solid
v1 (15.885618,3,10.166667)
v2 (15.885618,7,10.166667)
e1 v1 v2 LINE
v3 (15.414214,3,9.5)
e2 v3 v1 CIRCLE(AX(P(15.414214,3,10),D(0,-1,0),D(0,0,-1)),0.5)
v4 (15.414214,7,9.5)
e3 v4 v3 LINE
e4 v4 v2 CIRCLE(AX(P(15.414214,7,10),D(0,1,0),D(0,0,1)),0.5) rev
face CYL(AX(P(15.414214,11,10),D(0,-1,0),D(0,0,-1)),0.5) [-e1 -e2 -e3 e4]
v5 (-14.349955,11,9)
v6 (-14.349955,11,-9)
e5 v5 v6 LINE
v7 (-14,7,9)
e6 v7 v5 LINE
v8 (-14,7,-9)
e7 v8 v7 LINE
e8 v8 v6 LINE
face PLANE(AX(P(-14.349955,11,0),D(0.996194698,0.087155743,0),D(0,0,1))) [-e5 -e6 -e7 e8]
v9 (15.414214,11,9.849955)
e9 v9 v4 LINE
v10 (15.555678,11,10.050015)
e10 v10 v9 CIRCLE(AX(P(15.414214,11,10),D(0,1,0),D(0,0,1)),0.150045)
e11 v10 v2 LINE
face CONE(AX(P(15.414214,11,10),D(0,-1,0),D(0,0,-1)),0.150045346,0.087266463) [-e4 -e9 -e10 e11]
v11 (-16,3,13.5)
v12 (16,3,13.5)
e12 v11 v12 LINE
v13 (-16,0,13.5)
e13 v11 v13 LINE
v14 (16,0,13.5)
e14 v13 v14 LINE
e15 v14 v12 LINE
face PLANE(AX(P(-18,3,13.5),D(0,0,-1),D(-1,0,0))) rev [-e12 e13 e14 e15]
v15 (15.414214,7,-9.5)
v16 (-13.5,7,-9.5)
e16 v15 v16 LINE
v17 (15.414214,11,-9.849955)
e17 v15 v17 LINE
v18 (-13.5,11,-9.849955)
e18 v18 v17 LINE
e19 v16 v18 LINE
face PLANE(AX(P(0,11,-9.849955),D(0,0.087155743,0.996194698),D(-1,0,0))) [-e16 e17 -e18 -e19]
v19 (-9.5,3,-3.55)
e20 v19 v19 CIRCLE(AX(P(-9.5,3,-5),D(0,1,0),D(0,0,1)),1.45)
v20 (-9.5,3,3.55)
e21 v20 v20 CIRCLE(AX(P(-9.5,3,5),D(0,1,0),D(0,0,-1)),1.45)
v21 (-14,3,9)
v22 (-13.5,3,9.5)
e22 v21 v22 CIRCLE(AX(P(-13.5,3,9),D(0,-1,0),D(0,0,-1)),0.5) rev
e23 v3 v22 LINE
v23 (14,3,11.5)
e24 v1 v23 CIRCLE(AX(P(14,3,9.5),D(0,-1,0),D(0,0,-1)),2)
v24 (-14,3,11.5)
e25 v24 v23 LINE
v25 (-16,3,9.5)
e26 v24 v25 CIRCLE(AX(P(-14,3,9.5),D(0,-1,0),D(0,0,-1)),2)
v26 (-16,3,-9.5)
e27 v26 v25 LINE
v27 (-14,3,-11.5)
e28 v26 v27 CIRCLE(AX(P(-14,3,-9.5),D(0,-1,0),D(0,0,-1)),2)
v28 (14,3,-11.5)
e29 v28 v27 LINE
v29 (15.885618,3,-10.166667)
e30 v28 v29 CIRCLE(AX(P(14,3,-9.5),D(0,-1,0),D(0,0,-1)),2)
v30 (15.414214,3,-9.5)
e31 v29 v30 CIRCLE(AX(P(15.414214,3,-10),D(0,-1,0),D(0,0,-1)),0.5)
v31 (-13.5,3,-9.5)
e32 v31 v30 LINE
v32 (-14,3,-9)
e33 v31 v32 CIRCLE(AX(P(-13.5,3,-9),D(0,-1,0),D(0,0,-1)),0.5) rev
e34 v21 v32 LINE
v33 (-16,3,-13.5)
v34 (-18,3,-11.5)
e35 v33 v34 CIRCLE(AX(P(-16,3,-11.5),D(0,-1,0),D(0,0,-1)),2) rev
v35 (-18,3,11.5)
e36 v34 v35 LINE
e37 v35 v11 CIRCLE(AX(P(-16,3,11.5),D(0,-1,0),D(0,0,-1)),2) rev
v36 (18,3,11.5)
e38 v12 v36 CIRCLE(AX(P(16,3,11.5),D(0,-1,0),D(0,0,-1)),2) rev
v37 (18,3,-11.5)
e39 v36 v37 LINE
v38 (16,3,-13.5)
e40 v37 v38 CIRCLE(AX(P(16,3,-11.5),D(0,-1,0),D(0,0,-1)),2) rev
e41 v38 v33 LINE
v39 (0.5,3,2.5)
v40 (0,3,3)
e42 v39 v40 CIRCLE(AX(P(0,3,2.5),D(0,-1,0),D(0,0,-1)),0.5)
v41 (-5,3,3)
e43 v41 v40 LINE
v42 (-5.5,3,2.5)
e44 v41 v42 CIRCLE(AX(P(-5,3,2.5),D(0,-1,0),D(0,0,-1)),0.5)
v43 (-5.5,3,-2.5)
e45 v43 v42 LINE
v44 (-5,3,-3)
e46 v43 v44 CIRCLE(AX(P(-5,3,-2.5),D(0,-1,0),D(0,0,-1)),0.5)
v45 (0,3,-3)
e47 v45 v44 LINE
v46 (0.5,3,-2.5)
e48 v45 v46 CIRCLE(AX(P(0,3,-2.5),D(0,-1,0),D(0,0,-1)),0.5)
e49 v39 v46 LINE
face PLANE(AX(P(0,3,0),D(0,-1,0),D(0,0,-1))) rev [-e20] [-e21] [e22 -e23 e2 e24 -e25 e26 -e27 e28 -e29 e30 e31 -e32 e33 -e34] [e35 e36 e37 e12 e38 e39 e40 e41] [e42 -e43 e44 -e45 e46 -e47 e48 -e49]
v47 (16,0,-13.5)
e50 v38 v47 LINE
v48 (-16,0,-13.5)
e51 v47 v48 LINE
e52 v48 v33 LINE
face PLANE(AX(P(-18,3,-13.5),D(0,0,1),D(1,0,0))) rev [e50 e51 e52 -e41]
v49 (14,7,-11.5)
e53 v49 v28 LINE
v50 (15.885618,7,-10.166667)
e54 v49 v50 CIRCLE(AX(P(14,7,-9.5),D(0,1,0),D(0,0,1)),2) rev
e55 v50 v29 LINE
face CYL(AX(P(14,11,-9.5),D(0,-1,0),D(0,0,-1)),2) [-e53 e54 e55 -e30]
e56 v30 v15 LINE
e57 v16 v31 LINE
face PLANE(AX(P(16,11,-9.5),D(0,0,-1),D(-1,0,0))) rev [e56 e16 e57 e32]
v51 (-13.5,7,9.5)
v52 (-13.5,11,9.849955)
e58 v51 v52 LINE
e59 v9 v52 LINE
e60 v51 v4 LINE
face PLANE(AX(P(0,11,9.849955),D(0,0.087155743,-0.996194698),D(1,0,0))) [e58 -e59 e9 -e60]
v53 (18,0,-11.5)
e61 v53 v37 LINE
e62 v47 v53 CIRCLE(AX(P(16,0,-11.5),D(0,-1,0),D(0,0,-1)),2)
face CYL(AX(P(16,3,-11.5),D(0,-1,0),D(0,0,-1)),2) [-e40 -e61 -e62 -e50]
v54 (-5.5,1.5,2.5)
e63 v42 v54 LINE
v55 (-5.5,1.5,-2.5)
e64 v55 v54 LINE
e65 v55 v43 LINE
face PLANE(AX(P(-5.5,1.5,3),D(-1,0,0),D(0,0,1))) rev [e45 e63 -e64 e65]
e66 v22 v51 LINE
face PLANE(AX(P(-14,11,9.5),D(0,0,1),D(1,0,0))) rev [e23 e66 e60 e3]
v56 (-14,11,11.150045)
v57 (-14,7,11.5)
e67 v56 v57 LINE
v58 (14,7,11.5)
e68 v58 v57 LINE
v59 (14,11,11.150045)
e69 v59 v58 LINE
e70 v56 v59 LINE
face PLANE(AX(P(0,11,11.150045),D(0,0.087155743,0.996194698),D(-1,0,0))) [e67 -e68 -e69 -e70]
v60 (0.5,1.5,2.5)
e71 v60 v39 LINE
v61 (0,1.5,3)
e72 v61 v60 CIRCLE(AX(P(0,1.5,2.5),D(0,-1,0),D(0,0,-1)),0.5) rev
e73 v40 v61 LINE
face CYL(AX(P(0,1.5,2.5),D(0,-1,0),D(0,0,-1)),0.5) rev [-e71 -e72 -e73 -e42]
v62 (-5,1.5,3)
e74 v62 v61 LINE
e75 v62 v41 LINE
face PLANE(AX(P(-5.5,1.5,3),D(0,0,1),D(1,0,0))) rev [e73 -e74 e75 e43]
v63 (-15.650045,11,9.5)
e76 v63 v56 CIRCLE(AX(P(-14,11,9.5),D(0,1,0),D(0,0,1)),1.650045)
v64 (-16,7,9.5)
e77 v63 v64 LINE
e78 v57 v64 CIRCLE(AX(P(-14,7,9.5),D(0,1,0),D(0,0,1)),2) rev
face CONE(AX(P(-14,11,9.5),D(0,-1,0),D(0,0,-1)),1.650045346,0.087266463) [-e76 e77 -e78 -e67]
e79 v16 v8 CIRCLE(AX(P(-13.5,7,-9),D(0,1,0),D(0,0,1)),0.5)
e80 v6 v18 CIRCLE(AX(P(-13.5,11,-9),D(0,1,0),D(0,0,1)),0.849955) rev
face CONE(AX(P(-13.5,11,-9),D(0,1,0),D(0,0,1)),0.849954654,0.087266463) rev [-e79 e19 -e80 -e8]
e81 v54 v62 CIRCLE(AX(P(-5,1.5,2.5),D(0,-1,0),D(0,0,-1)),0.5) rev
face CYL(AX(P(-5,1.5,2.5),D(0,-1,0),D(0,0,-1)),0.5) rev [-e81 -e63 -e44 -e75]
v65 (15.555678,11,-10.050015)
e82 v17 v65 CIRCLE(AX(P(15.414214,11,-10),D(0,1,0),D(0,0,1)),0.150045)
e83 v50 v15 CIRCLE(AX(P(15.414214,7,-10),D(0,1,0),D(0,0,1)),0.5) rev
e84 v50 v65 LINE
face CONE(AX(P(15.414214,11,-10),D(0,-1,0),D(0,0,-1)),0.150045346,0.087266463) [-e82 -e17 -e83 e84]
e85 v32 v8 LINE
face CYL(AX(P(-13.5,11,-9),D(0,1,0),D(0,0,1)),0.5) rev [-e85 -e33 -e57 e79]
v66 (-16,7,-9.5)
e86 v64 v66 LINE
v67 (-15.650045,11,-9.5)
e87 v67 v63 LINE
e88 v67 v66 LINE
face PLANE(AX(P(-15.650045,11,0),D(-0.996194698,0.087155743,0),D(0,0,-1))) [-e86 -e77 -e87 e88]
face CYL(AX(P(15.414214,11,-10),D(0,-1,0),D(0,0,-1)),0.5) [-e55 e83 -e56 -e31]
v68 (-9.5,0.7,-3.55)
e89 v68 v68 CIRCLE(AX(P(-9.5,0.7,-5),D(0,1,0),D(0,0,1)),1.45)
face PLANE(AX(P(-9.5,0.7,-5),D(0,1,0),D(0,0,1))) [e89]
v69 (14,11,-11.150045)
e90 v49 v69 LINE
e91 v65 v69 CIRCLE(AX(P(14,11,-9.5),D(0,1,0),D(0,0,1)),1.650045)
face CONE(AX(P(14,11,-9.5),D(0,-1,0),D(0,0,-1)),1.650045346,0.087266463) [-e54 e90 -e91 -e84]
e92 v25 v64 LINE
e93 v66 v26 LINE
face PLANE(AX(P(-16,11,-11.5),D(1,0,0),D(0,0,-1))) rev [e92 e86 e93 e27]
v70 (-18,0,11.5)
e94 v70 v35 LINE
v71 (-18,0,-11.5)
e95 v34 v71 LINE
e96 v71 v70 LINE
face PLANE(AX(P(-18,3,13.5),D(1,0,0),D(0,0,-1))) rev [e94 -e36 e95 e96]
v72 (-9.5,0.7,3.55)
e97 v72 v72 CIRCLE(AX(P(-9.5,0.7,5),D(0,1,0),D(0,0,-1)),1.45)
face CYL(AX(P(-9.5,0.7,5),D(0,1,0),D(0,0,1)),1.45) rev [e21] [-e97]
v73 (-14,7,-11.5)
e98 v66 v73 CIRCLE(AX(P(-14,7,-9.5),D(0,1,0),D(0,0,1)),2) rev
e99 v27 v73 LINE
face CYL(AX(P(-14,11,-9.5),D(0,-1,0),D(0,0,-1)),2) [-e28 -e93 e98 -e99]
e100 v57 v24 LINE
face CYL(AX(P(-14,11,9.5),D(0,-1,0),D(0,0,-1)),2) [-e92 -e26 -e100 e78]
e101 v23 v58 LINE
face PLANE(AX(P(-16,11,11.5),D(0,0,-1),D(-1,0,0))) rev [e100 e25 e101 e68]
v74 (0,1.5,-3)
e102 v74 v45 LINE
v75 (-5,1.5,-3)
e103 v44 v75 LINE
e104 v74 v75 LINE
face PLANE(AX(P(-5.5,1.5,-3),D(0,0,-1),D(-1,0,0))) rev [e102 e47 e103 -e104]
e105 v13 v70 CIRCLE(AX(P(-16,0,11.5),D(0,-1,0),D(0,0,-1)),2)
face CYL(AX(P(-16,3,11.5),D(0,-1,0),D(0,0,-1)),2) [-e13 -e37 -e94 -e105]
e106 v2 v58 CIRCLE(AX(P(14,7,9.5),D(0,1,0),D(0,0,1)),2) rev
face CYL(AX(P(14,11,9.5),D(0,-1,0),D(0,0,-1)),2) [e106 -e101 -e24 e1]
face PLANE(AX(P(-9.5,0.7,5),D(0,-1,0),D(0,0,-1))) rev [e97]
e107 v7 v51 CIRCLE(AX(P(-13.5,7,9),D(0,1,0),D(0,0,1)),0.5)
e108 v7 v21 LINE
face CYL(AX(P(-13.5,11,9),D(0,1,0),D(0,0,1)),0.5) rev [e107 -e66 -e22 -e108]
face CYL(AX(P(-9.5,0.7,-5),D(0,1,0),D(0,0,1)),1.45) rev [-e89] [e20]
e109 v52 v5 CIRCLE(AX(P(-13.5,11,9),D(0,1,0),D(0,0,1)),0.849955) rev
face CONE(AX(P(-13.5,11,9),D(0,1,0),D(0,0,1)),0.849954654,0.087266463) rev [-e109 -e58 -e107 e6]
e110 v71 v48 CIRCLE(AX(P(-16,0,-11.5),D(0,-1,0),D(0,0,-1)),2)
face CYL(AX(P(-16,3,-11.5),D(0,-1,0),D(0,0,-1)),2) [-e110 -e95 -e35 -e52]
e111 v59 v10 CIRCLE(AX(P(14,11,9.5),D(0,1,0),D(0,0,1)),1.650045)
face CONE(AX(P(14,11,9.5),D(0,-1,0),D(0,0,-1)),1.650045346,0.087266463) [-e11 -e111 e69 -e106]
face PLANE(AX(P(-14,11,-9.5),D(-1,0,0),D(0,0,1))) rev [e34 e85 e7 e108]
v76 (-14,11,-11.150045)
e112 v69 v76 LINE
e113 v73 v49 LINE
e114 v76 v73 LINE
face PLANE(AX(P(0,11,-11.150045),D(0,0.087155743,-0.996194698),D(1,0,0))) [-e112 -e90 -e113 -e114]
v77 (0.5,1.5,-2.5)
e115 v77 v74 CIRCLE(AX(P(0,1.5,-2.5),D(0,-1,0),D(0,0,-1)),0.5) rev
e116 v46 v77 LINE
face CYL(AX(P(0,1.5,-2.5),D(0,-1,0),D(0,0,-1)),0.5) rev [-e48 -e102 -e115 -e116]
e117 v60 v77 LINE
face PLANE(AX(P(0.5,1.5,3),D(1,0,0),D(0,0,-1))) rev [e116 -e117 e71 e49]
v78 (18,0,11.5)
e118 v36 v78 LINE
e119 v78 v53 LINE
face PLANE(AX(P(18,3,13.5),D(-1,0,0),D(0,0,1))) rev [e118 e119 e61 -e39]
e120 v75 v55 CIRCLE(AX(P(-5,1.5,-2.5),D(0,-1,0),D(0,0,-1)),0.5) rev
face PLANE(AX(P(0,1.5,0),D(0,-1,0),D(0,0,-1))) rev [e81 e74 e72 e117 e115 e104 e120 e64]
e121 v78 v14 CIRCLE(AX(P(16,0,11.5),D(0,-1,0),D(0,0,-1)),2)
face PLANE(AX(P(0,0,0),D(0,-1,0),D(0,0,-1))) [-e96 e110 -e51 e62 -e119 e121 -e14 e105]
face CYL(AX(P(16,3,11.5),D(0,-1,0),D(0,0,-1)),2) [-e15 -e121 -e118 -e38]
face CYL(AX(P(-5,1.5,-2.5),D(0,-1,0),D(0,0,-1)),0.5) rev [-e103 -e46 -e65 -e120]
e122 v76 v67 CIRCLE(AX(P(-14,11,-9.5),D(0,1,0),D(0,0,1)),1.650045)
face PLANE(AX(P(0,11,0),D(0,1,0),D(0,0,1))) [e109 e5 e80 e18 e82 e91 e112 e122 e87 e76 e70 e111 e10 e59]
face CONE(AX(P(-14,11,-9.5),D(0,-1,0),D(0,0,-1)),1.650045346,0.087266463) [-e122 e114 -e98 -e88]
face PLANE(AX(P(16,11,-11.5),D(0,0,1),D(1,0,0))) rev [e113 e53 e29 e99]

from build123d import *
from OCP.BRepFilletAPI import BRepFilletAPI_MakeChamfer

# Parameters (mm, degrees)
SKETCH1_W           = 36
SKETCH1_H           = 27
BOSS_EXTRUDE1_DEPTH = 3
SKETCH2_W           = 6
SKETCH2_H           = 6
CUT_EXTRUDE1_DEPTH  = 1.5
SKETCH3_R           = 1.45
CUT_EXTRUDE2_DEPTH  = 2.3
BOSS_EXTRUDE3_DEPTH = 8
FILLET1_R           = 2
FILLET2_R           = 0.5
FILLET3_R           = 0.5
CHAMFER2_SIZE       = 4
CHAMFER2_SIZE2      = 0.349954654


with BuildPart() as part:
    # Sketch1 → Boss-Extrude1 (new body)
    with BuildSketch(Plane(origin=(0, 0, 0), x_dir=(1, 0, 0), z_dir=(0, 1, 0))):
        Rectangle(SKETCH1_W, SKETCH1_H)
    extrude(amount=BOSS_EXTRUDE1_DEPTH)

    # Sketch2 → Cut-Extrude1 (cut)
    with BuildSketch(Plane(origin=(0, 3, 0), x_dir=(1, 0, 0), z_dir=(0, 1, 0))):
        with Locations((-2.5, 0)):
            Rectangle(SKETCH2_W, SKETCH2_H)
    extrude(amount=-CUT_EXTRUDE1_DEPTH, mode=Mode.SUBTRACT)

    # Sketch3 → Cut-Extrude2 (cut)
    with BuildSketch(Plane(origin=(0, 3, 0), x_dir=(1, 0, 0), z_dir=(0, 1, 0))):
        with Locations(Location((-9.5, 5, 0), (0, 0, 270))):
            Circle(SKETCH3_R)
        with Locations(Location((-9.5, -5, 0), (0, 0, 90))):
            Circle(SKETCH3_R)
    extrude(amount=-CUT_EXTRUDE2_DEPTH, mode=Mode.SUBTRACT)

    # Sketch4 → Boss-Extrude3 (add)
    with BuildSketch(Plane(origin=(0, 3, 0), x_dir=(1, 0, 0), z_dir=(0, 1, 0))):
        Polygon((-16, 11.5), (-16, -11.5), (16, -11.5), (16, -9.5), (-14, -9.5), (-14, 9.5), (16, 9.5), (16, 11.5), align=None)
    extrude(amount=BOSS_EXTRUDE3_DEPTH)

    # Fillet1
    fillet1_edges = [part.edges().sort_by_distance(p)[0] for p in [
        (-16, 7, -11.5),
        (16, 7, -11.5),
        (16, 7, 11.5),
        (-16, 7, 11.5),
        (-18, 1.5, 13.5),
        (18, 1.5, 13.5),
        (-18, 1.5, -13.5),
        (18, 1.5, -13.5),
    ]]
    fillet(fillet1_edges, radius=FILLET1_R - 0.0001)  # a hair under: the kernel refuses the full size

    # Fillet2
    fillet2_edges = [part.edges().sort_by_distance(p)[0] for p in [
        (-14, 7, 9.5),
        (-14, 7, -9.5),
    ]]
    fillet(fillet2_edges, radius=FILLET2_R)

    # Fillet3
    fillet3_edges = [part.edges().sort_by_distance(p)[0] for p in [
        (0.5, 2.25, -3),
        (0.5, 2.25, 3),
        (-5.5, 2.25, 3),
        (-5.5, 2.25, -3),
        (16, 7, 9.5),
        (16, 7, -9.5),
    ]]
    fillet(fillet3_edges, radius=FILLET3_R)

    # Chamfer2: one chamfer whose edges measure the first distance from different faces: ONE call of the kernel's chamfer builder (chamfer() names one face for all edges)
    chamfer2_edges_1 = [part.edges().sort_by_distance(p)[0] for p in [
        (0.957121425, 11, -9.5),
    ]]
    chamfer2_side_1 = [part.faces().sort_by_distance(p)[0] for p in [
        (0.957121425, 7, -9.5),
    ]]
    chamfer2_edges_2 = [part.edges().sort_by_distance(p)[0] for p in [
        (-14, 11, 0),
    ]]
    chamfer2_side_2 = [part.faces().sort_by_distance(p)[0] for p in [
        (-14, 7, 0),
    ]]
    chamfer2_edges_3 = [part.edges().sort_by_distance(p)[0] for p in [
        (-13.853553391, 11, -9.353553391),
    ]]
    chamfer2_side_3 = [part.faces().sort_by_distance(p)[0] for p in [
        (-13.853553391, 7, -9.353553391),
    ]]
    chamfer2_edges_4 = [part.edges().sort_by_distance(p)[0] for p in [
        (-13.853553391, 11, 9.353553391),
    ]]
    chamfer2_side_4 = [part.faces().sort_by_distance(p)[0] for p in [
        (-13.853553391, 7, 9.353553391),
    ]]
    chamfer2_edges_5 = [part.edges().sort_by_distance(p)[0] for p in [
        (15.154781293, 11, -11.132984295),
    ]]
    chamfer2_side_5 = [part.faces().sort_by_distance(p)[0] for p in [
        (15.154781293, 7, -11.132984295),
    ]]
    chamfer2_edges_6 = [part.edges().sort_by_distance(p)[0] for p in [
        (0.957121425, 11, 9.5),
    ]]
    chamfer2_side_6 = [part.faces().sort_by_distance(p)[0] for p in [
        (0.957121425, 7, 9.5),
    ]]
    chamfer2_edges_7 = [part.edges().sort_by_distance(p)[0] for p in [
        (15.822484336, 11, 9.711315242),
    ]]
    chamfer2_side_7 = [part.faces().sort_by_distance(p)[0] for p in [
        (15.822484336, 7, 9.711315242),
    ]]
    chamfer2_edges_8 = [part.edges().sort_by_distance(p)[0] for p in [
        (15.822484336, 11, -9.711315242),
    ]]
    chamfer2_side_8 = [part.faces().sort_by_distance(p)[0] for p in [
        (15.822484336, 7, -9.711315242),
    ]]
    chamfer2_edges_9 = [part.edges().sort_by_distance(p)[0] for p in [
        (-16, 11, 0),
    ]]
    chamfer2_side_9 = [part.faces().sort_by_distance(p)[0] for p in [
        (-16, 7, 0),
    ]]
    chamfer2_edges_10 = [part.edges().sort_by_distance(p)[0] for p in [
        (0, 11, -11.5),
    ]]
    chamfer2_side_10 = [part.faces().sort_by_distance(p)[0] for p in [
        (0, 7, -11.5),
    ]]
    chamfer2_edges_11 = [part.edges().sort_by_distance(p)[0] for p in [
        (0, 11, 11.5),
    ]]
    chamfer2_side_11 = [part.faces().sort_by_distance(p)[0] for p in [
        (0, 7, 11.5),
    ]]
    chamfer2_edges_12 = [part.edges().sort_by_distance(p)[0] for p in [
        (-15.414242852, 11, 10.914242852),
    ]]
    chamfer2_side_12 = [part.faces().sort_by_distance(p)[0] for p in [
        (-15.414242852, 7, 10.914242852),
    ]]
    chamfer2_edges_13 = [part.edges().sort_by_distance(p)[0] for p in [
        (15.154781293, 11, 11.132984295),
    ]]
    chamfer2_side_13 = [part.faces().sort_by_distance(p)[0] for p in [
        (15.154781293, 7, 11.132984295),
    ]]
    chamfer2_edges_14 = [part.edges().sort_by_distance(p)[0] for p in [
        (-15.414242852, 11, -10.914242852),
    ]]
    chamfer2_side_14 = [part.faces().sort_by_distance(p)[0] for p in [
        (-15.414242852, 7, -10.914242852),
    ]]
    chamfer2 = BRepFilletAPI_MakeChamfer(part.part.solid().wrapped)
    for e in chamfer2_edges_1:
        chamfer2.Add(CHAMFER2_SIZE, CHAMFER2_SIZE2, e.wrapped, chamfer2_side_1[0].wrapped)  # the first distance lies on this face
    for e in chamfer2_edges_2:
        chamfer2.Add(CHAMFER2_SIZE, CHAMFER2_SIZE2, e.wrapped, chamfer2_side_2[0].wrapped)  # the first distance lies on this face
    for e in chamfer2_edges_3:
        chamfer2.Add(CHAMFER2_SIZE, CHAMFER2_SIZE2, e.wrapped, chamfer2_side_3[0].wrapped)  # the first distance lies on this face
    for e in chamfer2_edges_4:
        chamfer2.Add(CHAMFER2_SIZE, CHAMFER2_SIZE2, e.wrapped, chamfer2_side_4[0].wrapped)  # the first distance lies on this face
    for e in chamfer2_edges_5:
        chamfer2.Add(CHAMFER2_SIZE, CHAMFER2_SIZE2, e.wrapped, chamfer2_side_5[0].wrapped)  # the first distance lies on this face
    for e in chamfer2_edges_6:
        chamfer2.Add(CHAMFER2_SIZE, CHAMFER2_SIZE2, e.wrapped, chamfer2_side_6[0].wrapped)  # the first distance lies on this face
    for e in chamfer2_edges_7:
        chamfer2.Add(CHAMFER2_SIZE, CHAMFER2_SIZE2, e.wrapped, chamfer2_side_7[0].wrapped)  # the first distance lies on this face
    for e in chamfer2_edges_8:
        chamfer2.Add(CHAMFER2_SIZE, CHAMFER2_SIZE2, e.wrapped, chamfer2_side_8[0].wrapped)  # the first distance lies on this face
    for e in chamfer2_edges_9:
        chamfer2.Add(CHAMFER2_SIZE, CHAMFER2_SIZE2, e.wrapped, chamfer2_side_9[0].wrapped)  # the first distance lies on this face
    for e in chamfer2_edges_10:
        chamfer2.Add(CHAMFER2_SIZE, CHAMFER2_SIZE2, e.wrapped, chamfer2_side_10[0].wrapped)  # the first distance lies on this face
    for e in chamfer2_edges_11:
        chamfer2.Add(CHAMFER2_SIZE, CHAMFER2_SIZE2, e.wrapped, chamfer2_side_11[0].wrapped)  # the first distance lies on this face
    for e in chamfer2_edges_12:
        chamfer2.Add(CHAMFER2_SIZE, CHAMFER2_SIZE2, e.wrapped, chamfer2_side_12[0].wrapped)  # the first distance lies on this face
    for e in chamfer2_edges_13:
        chamfer2.Add(CHAMFER2_SIZE, CHAMFER2_SIZE2, e.wrapped, chamfer2_side_13[0].wrapped)  # the first distance lies on this face
    for e in chamfer2_edges_14:
        chamfer2.Add(CHAMFER2_SIZE, CHAMFER2_SIZE2, e.wrapped, chamfer2_side_14[0].wrapped)  # the first distance lies on this face
    add(Compound.cast(chamfer2.Shape()), mode=Mode.REPLACE)


solid = part.part
